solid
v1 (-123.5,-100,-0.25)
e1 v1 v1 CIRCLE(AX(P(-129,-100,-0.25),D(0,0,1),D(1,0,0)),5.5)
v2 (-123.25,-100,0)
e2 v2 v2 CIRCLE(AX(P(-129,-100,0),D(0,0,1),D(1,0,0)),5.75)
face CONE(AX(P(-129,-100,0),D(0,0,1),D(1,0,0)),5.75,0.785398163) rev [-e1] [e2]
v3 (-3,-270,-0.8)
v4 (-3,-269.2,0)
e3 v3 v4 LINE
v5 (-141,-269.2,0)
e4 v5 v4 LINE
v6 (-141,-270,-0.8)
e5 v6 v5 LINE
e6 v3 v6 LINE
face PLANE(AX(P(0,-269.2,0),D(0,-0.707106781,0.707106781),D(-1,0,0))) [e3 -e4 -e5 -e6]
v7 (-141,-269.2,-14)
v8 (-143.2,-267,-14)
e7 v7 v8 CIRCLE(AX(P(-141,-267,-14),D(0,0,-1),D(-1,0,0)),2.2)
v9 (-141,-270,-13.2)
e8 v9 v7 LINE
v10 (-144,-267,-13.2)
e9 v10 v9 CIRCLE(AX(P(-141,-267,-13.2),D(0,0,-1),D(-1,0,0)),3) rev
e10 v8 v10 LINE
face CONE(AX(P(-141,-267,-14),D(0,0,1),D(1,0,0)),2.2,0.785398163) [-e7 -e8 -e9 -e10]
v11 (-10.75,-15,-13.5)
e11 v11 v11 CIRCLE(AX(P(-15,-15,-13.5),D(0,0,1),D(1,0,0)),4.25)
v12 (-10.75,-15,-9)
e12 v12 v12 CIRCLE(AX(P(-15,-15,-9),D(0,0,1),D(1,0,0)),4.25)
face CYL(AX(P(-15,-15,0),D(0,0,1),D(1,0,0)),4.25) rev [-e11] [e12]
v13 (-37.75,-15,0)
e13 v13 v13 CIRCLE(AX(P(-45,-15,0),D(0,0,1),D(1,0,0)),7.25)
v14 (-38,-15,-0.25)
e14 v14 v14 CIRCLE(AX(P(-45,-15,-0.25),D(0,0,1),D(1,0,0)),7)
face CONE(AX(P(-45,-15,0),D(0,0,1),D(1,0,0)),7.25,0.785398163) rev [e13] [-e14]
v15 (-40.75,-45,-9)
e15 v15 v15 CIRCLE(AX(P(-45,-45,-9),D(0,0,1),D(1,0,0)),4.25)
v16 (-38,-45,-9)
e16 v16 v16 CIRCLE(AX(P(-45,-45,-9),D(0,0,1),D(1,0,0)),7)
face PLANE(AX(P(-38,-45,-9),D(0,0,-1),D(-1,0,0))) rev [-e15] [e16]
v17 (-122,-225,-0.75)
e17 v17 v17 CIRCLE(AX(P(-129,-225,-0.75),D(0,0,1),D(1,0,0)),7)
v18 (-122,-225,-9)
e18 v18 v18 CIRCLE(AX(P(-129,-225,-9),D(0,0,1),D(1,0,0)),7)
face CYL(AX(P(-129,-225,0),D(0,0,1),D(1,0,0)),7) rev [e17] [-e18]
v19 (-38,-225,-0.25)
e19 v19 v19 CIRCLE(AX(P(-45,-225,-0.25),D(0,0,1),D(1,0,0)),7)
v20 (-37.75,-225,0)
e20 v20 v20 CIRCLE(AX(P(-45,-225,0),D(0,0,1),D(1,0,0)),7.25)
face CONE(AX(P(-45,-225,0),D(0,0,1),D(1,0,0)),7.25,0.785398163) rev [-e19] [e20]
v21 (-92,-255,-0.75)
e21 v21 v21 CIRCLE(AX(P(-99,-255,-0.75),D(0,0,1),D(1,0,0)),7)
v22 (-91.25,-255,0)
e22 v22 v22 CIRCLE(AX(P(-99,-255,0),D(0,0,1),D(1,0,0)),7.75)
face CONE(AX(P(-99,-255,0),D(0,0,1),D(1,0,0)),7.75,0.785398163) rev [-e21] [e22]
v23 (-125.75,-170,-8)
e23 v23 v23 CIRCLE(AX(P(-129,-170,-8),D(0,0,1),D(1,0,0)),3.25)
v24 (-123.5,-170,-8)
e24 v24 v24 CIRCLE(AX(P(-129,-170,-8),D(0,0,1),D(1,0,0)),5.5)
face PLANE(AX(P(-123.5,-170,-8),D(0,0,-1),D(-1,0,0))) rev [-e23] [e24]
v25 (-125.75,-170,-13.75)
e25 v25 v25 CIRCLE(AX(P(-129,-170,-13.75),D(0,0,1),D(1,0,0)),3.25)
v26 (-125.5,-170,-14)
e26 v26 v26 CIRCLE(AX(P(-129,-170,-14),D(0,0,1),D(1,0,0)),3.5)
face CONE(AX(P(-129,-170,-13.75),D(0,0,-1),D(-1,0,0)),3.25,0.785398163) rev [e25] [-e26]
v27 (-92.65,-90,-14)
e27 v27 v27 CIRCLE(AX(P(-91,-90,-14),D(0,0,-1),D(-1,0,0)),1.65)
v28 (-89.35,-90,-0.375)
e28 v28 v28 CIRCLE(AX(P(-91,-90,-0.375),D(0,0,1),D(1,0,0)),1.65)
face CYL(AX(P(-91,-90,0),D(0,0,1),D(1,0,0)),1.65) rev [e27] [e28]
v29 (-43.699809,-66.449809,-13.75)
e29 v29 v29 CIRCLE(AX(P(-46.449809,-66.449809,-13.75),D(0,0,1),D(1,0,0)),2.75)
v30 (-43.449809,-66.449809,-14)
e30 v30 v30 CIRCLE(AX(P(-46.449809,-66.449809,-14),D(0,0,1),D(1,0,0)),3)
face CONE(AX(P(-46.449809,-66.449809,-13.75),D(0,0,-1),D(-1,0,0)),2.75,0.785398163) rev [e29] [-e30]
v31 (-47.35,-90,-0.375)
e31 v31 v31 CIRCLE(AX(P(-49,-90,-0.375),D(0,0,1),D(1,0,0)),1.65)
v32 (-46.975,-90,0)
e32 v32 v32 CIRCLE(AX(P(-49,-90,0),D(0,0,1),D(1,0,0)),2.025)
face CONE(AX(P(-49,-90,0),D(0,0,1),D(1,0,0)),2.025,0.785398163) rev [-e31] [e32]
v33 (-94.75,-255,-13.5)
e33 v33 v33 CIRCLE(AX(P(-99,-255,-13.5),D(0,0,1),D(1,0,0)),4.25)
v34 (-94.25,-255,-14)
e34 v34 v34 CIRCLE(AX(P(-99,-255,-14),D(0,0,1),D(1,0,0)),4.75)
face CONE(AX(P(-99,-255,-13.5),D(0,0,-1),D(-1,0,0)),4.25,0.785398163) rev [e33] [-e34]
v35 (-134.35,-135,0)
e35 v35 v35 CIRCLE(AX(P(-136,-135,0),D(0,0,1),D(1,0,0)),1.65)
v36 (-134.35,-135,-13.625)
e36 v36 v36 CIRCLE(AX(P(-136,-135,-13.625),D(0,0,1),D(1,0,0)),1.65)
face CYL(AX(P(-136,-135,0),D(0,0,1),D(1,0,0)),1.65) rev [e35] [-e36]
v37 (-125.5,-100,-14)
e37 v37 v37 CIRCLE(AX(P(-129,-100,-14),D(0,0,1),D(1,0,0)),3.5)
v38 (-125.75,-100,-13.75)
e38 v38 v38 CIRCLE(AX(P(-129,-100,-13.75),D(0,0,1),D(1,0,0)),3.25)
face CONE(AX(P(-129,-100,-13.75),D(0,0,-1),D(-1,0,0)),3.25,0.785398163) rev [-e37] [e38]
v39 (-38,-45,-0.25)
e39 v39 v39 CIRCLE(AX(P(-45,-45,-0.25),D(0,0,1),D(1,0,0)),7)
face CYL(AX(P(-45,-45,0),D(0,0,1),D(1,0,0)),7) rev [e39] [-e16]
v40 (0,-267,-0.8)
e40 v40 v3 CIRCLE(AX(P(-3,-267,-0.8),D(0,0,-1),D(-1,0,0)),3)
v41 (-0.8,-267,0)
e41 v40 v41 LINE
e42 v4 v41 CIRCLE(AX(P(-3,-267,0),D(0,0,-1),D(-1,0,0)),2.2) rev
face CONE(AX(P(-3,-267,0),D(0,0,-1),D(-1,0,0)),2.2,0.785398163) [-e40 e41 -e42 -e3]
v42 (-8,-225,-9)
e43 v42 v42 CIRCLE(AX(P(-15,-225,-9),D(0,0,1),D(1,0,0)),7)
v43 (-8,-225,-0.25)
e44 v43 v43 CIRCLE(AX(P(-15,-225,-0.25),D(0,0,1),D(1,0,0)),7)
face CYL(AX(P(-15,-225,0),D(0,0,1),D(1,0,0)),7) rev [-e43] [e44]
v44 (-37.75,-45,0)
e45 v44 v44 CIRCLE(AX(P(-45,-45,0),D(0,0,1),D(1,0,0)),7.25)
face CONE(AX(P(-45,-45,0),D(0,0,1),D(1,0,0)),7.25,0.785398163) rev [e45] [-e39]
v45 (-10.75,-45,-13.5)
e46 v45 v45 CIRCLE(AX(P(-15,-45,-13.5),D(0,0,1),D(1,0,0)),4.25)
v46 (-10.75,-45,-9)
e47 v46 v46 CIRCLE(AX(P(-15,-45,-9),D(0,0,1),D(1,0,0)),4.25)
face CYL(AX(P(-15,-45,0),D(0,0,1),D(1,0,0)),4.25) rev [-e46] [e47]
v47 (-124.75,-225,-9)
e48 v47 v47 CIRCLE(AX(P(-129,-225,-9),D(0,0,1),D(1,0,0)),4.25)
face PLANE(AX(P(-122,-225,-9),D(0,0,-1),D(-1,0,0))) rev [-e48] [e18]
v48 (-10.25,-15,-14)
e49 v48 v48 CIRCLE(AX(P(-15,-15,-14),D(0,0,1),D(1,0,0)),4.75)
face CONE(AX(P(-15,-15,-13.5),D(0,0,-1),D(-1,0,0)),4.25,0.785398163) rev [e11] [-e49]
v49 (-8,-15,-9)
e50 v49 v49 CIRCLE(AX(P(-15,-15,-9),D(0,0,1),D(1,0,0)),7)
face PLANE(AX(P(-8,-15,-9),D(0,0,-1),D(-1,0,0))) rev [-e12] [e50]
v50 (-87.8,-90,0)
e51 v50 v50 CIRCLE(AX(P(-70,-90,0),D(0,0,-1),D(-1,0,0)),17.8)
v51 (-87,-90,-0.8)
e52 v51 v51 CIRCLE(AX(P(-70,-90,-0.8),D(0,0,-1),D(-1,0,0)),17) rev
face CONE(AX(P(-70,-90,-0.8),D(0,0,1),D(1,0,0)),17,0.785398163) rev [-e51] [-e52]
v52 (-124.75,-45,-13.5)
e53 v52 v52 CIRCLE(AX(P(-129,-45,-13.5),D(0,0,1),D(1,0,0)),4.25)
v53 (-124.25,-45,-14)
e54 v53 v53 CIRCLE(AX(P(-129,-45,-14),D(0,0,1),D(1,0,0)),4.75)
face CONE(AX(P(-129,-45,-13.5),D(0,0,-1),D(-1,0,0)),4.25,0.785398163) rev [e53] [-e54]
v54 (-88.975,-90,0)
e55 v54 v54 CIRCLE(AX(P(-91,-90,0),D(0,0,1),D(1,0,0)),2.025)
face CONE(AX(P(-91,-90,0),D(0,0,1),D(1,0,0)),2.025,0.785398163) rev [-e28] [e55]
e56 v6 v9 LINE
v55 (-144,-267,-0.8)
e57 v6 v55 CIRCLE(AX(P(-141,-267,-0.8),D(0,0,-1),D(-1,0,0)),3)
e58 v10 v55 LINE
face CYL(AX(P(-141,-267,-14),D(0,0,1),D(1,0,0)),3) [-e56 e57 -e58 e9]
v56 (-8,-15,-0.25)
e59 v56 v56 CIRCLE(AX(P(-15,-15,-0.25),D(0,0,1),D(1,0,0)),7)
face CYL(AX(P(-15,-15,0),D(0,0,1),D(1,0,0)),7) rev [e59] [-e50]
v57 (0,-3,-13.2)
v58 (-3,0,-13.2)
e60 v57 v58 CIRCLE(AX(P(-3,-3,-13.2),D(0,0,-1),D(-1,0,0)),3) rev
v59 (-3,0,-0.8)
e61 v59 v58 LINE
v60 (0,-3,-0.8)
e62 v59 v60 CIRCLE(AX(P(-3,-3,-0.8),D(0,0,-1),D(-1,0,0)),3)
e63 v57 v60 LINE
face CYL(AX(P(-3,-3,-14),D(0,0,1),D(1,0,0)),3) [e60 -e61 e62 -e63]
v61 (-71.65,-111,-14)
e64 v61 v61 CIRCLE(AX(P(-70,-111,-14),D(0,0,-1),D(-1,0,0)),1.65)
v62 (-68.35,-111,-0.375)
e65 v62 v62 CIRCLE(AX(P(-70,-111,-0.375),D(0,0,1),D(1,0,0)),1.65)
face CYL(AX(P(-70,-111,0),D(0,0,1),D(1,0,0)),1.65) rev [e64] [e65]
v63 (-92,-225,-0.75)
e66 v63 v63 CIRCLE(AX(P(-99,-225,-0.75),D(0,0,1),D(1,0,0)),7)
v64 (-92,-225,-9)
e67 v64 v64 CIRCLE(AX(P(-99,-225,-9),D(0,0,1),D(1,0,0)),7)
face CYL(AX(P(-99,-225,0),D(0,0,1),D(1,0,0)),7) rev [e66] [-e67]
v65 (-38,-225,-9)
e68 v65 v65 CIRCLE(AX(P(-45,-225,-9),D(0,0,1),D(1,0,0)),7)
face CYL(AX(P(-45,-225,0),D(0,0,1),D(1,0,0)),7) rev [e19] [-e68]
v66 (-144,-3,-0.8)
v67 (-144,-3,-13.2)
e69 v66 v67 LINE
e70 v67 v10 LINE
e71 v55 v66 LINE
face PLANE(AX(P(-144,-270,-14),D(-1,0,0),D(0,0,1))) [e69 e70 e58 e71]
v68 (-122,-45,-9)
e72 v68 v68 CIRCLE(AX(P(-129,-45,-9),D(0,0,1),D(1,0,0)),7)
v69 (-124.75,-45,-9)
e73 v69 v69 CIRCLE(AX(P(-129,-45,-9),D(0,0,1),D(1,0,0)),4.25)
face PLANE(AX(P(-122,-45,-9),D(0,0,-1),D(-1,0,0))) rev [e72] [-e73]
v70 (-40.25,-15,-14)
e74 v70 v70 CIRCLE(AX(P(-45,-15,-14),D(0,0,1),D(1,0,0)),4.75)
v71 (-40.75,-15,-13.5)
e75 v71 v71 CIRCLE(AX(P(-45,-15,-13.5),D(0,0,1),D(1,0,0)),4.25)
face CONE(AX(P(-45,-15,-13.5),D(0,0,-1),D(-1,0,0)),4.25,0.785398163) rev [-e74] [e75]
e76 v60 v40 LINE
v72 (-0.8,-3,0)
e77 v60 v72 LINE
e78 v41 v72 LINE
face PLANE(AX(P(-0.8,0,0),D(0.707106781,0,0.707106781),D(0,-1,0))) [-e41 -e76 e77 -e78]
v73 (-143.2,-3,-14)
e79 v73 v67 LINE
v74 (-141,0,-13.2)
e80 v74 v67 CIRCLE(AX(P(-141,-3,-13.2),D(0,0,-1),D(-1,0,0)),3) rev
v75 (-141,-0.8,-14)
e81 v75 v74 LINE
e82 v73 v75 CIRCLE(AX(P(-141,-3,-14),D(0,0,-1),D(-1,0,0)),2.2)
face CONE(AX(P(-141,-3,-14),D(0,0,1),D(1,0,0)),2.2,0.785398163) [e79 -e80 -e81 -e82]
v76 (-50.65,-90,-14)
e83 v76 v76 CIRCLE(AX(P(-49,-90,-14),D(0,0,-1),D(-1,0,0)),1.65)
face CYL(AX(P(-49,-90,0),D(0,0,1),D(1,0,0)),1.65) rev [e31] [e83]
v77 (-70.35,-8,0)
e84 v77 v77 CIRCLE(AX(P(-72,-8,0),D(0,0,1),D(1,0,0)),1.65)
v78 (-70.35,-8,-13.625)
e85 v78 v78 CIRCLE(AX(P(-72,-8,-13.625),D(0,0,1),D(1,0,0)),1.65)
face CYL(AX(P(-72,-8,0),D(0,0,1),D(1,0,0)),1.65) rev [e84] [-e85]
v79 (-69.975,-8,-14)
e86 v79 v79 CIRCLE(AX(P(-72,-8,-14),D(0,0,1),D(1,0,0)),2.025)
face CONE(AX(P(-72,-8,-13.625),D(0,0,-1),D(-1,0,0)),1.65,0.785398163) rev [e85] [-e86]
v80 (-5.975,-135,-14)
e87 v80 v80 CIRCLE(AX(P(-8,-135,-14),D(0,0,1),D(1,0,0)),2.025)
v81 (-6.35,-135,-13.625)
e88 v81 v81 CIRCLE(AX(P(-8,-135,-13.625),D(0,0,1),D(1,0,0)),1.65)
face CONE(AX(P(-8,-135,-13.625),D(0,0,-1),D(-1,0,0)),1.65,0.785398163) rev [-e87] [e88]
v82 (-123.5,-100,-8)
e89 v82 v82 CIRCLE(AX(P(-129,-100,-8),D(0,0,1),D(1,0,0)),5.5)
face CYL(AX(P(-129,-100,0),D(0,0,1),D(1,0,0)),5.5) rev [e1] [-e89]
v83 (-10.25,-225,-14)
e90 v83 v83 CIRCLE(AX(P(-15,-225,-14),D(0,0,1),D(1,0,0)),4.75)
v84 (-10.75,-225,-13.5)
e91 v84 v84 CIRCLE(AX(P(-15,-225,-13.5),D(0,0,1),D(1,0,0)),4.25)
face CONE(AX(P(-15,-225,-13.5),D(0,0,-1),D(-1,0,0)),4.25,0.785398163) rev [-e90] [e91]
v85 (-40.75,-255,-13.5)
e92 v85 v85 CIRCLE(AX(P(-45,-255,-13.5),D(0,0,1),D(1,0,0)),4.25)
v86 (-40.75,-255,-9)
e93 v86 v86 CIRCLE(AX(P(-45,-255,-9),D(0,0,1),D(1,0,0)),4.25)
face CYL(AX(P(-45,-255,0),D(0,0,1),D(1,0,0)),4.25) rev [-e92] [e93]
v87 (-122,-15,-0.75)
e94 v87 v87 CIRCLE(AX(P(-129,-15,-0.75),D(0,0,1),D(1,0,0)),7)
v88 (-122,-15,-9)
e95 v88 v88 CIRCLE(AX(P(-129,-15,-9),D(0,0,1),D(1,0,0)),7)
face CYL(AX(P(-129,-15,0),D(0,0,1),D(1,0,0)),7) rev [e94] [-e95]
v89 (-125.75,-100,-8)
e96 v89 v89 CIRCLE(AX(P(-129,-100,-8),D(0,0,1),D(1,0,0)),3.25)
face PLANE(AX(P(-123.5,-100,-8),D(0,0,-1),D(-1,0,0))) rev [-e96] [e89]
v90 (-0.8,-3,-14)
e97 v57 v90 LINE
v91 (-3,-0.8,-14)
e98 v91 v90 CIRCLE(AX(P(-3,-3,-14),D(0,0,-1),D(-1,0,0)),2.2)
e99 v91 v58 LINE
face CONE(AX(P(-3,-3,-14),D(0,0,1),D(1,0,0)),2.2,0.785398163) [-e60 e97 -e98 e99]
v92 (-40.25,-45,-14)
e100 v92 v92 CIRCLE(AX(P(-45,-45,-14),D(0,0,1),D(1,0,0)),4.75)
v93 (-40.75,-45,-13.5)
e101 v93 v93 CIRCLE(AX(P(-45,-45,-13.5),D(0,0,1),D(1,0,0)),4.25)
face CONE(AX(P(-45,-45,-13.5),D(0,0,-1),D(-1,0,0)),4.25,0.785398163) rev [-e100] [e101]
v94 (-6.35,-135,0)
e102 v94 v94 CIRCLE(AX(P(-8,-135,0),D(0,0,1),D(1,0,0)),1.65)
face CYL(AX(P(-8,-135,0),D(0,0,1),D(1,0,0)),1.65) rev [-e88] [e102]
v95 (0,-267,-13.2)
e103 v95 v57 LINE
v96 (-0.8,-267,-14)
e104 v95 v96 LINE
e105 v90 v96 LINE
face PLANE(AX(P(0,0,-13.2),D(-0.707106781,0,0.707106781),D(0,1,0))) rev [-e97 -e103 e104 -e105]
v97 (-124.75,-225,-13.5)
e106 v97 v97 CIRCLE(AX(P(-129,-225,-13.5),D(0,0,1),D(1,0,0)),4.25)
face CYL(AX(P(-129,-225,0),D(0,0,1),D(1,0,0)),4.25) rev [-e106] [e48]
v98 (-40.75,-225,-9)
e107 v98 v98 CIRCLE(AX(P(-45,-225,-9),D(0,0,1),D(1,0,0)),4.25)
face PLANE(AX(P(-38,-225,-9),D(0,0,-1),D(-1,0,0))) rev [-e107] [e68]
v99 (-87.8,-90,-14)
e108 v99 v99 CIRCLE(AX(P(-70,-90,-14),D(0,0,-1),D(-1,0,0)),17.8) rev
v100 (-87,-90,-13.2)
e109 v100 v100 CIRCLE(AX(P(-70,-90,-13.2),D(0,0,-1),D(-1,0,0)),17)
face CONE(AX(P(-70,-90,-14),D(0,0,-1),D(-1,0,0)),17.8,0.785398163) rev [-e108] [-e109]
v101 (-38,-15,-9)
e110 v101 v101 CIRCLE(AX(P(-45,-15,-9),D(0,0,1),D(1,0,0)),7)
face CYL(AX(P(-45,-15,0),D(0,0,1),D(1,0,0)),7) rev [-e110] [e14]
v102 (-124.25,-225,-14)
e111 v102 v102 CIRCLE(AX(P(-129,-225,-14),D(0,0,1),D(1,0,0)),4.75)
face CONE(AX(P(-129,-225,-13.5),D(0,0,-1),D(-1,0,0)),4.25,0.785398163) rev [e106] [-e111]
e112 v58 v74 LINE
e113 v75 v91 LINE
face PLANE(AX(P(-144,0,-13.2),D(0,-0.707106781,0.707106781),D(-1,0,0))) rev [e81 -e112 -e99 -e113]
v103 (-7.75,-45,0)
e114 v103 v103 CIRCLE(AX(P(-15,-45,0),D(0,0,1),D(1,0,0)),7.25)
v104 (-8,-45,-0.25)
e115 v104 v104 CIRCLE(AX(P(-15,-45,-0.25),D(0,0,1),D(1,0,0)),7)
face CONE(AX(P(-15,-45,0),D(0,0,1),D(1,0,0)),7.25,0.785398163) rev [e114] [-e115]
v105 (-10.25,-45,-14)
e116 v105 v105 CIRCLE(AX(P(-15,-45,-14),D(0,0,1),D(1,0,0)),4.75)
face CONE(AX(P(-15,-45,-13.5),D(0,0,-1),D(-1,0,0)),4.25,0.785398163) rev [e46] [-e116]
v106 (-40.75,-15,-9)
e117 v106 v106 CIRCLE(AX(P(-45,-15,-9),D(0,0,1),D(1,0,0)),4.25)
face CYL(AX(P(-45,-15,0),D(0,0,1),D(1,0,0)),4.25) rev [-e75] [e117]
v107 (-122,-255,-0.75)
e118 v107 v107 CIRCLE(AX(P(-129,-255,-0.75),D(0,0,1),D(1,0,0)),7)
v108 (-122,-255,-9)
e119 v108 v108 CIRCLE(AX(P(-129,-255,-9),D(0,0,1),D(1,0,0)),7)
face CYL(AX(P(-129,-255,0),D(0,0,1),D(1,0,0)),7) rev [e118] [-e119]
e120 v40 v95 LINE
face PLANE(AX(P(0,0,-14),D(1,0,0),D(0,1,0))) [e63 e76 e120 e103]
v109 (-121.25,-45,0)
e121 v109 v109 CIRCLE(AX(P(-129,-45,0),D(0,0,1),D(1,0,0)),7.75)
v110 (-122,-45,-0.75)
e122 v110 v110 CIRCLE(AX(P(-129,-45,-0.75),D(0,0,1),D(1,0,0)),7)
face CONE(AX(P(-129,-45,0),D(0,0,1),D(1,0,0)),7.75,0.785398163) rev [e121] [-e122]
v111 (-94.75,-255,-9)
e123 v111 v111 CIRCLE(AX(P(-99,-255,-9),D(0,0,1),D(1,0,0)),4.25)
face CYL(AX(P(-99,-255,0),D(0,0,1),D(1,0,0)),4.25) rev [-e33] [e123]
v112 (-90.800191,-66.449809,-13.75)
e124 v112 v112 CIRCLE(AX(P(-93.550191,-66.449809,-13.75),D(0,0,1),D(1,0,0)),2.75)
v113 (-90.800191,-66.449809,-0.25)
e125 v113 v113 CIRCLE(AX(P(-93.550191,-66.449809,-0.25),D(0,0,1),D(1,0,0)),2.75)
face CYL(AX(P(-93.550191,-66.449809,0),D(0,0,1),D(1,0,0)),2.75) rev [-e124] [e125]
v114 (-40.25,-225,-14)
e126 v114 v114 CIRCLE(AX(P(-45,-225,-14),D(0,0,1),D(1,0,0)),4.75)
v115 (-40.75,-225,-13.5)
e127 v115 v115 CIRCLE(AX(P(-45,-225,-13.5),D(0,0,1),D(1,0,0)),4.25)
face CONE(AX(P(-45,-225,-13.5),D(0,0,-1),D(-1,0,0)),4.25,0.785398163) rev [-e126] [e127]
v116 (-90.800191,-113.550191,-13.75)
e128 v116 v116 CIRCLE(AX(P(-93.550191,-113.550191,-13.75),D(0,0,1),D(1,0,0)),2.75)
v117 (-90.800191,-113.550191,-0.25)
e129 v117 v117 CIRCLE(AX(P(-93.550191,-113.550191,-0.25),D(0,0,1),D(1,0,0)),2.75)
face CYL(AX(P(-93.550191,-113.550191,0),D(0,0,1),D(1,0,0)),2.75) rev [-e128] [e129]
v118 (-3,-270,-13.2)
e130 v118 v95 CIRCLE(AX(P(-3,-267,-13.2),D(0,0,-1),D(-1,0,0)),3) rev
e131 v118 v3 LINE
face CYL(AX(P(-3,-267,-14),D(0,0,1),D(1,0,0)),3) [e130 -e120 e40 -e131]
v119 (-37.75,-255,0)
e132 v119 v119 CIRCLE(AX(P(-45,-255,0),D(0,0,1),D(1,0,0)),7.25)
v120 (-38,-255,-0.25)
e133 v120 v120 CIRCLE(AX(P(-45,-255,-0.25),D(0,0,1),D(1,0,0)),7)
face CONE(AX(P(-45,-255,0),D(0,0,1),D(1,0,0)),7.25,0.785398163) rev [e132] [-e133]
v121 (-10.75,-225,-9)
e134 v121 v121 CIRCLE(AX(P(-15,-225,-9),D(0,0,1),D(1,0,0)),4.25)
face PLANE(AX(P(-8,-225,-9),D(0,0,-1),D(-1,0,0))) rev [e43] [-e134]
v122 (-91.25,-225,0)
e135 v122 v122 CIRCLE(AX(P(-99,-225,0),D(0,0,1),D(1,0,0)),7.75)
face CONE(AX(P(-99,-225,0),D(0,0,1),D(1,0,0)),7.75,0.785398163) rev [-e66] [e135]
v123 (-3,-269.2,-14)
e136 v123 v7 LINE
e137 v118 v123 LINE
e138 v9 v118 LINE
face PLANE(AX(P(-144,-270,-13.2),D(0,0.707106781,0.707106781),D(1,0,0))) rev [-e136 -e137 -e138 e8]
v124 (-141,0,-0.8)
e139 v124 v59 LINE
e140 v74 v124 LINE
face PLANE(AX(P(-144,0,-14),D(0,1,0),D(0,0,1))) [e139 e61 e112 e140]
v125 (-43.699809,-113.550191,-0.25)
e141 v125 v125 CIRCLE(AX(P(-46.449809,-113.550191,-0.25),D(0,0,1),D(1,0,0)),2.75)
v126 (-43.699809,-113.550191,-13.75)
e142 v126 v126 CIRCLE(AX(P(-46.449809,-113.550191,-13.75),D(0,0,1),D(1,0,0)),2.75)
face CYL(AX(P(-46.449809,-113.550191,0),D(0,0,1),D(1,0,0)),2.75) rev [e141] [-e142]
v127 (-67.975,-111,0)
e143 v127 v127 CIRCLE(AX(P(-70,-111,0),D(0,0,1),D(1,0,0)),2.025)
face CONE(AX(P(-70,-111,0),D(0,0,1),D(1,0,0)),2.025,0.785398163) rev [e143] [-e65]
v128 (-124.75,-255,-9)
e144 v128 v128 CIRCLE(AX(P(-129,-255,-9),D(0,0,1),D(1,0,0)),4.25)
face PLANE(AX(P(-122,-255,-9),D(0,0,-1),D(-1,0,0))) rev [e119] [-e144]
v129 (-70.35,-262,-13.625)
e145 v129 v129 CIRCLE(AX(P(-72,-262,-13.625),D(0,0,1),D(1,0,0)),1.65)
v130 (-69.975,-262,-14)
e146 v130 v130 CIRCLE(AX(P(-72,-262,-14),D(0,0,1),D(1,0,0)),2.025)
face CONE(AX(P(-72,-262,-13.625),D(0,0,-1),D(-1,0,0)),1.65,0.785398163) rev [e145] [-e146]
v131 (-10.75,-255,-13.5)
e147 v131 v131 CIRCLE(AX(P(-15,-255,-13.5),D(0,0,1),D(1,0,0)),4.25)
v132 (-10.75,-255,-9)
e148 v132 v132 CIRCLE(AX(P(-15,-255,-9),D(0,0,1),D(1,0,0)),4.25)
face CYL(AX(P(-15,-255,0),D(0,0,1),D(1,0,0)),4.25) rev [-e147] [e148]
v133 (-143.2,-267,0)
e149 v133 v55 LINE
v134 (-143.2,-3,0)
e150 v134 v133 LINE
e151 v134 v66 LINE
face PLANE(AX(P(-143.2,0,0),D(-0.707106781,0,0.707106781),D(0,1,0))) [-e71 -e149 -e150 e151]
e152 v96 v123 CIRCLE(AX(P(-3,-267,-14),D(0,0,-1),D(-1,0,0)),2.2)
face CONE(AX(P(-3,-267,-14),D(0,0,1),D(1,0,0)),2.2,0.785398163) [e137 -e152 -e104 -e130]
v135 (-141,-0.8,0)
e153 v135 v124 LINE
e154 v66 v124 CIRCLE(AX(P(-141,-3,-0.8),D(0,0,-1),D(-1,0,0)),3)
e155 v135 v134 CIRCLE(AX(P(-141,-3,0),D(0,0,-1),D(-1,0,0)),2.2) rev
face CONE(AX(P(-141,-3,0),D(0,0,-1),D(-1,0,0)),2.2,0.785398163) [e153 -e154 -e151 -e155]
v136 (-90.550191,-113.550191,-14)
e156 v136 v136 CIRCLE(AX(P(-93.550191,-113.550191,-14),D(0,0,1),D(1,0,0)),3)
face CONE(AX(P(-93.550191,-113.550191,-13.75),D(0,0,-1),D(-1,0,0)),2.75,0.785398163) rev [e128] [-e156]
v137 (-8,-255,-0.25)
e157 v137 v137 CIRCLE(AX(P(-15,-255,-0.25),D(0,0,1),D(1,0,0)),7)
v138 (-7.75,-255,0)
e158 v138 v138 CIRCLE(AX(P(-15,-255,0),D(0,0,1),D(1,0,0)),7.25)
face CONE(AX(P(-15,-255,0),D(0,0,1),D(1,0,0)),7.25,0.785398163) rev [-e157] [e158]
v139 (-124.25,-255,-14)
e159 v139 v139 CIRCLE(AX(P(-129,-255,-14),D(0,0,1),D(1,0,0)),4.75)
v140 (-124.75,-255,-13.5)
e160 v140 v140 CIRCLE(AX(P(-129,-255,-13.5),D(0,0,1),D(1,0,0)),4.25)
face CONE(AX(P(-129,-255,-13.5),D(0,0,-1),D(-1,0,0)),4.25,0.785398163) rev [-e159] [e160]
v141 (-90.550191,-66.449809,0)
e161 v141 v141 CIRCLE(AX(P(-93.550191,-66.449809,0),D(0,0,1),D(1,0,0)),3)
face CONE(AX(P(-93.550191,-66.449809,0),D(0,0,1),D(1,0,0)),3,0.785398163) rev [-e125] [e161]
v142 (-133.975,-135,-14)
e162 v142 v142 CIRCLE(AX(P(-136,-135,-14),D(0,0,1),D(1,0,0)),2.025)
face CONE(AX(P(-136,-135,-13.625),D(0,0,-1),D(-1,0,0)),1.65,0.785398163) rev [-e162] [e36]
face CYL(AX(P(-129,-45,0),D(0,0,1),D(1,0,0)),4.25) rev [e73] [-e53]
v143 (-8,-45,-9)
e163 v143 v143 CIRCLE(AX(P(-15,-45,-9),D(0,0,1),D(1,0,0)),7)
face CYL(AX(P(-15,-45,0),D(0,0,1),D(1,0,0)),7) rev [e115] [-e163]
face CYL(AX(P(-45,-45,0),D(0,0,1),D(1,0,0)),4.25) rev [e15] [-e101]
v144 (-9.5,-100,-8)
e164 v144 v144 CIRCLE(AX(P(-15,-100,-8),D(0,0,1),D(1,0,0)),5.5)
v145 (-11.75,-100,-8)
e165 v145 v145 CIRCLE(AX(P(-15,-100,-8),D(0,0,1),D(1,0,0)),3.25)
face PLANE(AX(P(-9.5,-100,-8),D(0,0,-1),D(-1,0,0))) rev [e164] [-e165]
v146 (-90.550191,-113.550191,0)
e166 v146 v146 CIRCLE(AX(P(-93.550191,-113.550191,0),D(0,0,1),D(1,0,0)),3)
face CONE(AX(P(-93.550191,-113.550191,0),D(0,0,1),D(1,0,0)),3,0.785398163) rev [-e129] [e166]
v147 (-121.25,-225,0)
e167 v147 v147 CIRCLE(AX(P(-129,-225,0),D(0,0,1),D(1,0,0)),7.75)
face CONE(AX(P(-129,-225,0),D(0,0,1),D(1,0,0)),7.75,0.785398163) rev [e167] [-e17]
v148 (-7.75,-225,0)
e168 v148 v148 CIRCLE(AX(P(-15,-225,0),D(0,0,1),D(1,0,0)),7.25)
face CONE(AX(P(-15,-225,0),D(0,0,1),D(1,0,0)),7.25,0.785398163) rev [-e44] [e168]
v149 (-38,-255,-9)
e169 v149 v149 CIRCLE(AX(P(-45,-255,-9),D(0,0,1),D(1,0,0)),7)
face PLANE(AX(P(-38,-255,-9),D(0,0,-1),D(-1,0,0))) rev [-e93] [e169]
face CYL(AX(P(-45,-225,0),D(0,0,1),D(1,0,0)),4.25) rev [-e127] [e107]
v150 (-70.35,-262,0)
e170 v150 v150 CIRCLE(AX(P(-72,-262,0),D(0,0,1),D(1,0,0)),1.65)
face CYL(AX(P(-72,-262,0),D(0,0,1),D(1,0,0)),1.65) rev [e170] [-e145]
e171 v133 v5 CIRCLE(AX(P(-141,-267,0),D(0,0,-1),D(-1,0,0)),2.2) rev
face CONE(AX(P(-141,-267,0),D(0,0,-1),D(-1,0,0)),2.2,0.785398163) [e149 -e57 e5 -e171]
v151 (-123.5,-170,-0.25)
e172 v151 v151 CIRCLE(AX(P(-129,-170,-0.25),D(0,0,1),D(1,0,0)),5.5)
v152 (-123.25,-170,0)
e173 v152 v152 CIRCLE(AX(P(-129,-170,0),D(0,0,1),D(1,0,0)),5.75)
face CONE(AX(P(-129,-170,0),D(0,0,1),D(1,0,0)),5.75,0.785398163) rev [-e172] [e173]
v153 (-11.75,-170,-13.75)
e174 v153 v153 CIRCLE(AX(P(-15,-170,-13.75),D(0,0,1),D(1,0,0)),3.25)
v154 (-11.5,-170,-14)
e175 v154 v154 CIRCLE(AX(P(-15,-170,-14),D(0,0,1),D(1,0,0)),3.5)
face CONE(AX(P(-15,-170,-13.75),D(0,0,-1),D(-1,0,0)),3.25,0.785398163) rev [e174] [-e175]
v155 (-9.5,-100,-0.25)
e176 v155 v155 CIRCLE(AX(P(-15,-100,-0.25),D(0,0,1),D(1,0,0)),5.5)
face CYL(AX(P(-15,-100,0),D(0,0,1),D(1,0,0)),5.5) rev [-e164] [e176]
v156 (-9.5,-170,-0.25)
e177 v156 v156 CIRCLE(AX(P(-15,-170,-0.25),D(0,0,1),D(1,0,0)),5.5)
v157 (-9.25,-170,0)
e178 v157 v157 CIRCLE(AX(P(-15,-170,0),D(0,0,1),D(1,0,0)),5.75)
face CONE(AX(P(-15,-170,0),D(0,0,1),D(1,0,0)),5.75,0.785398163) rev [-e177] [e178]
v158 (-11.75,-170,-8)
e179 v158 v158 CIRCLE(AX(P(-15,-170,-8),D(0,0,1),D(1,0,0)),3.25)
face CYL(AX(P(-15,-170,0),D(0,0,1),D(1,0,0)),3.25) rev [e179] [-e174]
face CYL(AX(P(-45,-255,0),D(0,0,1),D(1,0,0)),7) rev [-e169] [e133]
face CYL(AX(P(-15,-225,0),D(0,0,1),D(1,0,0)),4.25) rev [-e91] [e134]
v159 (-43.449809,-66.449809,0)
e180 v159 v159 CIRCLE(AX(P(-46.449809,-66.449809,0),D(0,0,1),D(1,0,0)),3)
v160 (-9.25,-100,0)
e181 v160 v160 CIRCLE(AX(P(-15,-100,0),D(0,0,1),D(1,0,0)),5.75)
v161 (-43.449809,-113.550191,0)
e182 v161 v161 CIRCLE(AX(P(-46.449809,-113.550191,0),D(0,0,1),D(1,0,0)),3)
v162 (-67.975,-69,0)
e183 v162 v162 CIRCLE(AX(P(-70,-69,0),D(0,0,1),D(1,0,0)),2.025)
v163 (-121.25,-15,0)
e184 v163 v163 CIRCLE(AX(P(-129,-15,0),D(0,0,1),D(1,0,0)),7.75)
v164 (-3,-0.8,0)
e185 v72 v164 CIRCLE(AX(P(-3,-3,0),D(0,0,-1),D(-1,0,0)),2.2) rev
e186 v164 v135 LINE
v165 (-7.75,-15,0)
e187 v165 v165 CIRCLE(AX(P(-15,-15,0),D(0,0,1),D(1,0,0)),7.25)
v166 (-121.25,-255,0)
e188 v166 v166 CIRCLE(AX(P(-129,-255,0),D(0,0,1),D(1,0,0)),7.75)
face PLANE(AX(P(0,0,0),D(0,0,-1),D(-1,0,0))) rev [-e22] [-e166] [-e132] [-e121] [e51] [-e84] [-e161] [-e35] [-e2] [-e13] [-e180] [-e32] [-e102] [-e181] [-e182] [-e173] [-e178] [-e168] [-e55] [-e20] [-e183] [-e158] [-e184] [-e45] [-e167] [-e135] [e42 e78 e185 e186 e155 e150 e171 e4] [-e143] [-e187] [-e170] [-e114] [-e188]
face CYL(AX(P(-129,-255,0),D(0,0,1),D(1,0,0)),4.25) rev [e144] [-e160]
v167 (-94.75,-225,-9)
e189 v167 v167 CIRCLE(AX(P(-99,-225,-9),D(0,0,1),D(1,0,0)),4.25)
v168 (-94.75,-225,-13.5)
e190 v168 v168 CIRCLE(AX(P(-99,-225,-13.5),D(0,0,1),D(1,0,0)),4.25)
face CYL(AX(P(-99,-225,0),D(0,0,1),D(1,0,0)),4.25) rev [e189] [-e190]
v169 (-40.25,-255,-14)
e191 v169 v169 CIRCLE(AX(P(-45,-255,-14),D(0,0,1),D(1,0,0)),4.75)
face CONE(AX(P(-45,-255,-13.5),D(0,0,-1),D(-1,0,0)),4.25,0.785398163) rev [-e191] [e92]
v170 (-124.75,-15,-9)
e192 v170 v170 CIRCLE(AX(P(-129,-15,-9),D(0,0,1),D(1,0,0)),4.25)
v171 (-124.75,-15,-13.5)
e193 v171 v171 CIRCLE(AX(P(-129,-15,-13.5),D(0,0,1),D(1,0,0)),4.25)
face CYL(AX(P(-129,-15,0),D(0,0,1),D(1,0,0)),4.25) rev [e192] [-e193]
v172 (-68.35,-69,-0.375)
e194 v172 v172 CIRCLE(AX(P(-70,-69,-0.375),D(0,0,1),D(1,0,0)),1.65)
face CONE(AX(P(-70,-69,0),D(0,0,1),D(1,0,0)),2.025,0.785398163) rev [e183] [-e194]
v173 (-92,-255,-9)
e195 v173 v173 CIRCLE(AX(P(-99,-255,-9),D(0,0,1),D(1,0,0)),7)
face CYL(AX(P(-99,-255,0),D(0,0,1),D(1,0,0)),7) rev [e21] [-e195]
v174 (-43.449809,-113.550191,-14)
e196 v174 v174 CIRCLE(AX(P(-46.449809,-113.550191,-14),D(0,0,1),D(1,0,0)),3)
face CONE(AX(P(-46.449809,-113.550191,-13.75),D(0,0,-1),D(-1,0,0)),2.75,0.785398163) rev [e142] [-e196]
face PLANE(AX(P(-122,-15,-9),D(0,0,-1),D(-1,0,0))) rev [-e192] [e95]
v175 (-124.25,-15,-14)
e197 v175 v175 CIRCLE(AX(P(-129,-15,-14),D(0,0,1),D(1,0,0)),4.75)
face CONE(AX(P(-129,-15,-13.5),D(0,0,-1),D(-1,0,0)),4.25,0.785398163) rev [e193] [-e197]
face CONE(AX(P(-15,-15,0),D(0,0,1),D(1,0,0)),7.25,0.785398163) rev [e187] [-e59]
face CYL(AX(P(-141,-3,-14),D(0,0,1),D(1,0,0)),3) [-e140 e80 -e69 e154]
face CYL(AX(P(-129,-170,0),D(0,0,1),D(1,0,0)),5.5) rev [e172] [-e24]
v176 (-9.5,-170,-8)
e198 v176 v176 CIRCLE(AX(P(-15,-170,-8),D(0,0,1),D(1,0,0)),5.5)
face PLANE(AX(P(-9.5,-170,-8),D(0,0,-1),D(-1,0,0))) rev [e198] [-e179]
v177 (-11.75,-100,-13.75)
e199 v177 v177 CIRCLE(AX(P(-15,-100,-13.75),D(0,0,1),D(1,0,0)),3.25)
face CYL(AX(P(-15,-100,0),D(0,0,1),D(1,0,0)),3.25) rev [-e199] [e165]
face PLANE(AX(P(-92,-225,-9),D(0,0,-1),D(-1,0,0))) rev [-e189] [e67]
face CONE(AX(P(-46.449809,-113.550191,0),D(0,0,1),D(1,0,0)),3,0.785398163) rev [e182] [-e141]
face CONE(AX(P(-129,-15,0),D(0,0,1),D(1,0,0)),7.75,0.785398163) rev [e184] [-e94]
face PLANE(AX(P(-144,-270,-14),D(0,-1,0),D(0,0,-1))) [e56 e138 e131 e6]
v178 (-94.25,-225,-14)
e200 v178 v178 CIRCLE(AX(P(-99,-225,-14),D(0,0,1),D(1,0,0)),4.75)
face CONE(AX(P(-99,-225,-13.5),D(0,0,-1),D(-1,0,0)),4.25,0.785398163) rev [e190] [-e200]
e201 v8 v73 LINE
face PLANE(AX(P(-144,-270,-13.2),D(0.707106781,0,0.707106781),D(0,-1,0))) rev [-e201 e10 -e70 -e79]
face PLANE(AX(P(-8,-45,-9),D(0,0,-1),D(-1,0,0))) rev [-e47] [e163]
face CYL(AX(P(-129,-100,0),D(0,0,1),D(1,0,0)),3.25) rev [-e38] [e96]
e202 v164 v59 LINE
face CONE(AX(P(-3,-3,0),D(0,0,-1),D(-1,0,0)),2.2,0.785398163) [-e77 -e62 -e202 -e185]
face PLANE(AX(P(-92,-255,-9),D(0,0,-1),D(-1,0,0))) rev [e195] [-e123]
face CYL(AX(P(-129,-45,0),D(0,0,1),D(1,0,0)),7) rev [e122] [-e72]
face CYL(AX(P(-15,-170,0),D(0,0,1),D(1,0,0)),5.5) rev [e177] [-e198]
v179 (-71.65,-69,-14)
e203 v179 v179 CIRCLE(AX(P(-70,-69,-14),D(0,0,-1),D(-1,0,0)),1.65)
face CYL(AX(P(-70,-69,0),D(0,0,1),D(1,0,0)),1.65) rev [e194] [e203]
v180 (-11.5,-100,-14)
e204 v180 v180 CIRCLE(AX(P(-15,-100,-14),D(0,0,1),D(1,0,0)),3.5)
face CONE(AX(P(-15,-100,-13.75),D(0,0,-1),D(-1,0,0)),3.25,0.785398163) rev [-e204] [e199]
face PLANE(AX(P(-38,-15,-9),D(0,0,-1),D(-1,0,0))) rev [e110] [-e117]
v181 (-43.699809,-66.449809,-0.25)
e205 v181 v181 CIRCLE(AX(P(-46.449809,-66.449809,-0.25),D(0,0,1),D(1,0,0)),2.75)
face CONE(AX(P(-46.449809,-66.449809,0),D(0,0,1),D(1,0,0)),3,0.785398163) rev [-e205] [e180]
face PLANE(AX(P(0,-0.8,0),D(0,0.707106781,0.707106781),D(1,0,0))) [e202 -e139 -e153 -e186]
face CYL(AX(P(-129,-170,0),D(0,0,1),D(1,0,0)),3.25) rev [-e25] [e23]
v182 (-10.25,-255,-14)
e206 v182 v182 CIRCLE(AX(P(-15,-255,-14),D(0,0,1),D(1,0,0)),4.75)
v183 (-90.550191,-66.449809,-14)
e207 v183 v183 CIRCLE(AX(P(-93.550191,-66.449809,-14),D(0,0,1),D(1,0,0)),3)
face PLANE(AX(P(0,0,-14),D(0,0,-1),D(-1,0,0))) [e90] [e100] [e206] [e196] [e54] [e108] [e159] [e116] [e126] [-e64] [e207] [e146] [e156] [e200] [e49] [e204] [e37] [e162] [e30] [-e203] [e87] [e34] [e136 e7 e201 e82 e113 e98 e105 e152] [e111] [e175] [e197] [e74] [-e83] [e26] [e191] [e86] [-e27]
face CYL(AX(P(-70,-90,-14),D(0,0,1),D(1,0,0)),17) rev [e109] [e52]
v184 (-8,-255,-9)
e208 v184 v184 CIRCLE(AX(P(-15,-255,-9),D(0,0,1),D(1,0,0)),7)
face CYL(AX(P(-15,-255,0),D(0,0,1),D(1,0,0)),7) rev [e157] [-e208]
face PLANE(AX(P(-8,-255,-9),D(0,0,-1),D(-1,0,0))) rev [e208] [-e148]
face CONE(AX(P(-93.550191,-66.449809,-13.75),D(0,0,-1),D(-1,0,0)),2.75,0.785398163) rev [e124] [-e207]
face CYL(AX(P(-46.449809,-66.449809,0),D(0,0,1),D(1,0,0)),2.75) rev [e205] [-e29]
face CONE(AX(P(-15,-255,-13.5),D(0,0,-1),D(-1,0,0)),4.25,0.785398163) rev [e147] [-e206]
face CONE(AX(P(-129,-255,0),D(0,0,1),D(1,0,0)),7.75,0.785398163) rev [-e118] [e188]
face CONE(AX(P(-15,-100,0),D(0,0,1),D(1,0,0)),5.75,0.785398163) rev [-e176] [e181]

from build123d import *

# Parameters (mm, degrees)
SKETCH1_W                                     = 144
SKETCH1_H                                     = 270
SKETCH1_R                                     = 17
BASE_FLANGE1_DEPTH                            = 14
CBORE_FOR_M8_HEX_SOCKET_HEAD_CAP_SCR_2_COUNT  = 2
CBORE_FOR_M8_HEX_SOCKET_HEAD_CAP_SCR_2_PITCH  = 30
CBORE_FOR_M8_HEX_SOCKET_HEAD_CAP_SCR_3_COUNT  = 2
CBORE_FOR_M8_HEX_SOCKET_HEAD_CAP_SCR_3_PITCH  = 42.426406871
CBORE_FOR_M8_HEX_SOCKET_HEAD_CAP_SCR_4_COUNT  = 2
CBORE_FOR_M8_HEX_SOCKET_HEAD_CAP_SCR_4_PITCH  = 30
CBORE_FOR_M8_HEX_SOCKET_HEAD_CAP_SCR_5_COUNT  = 2
CBORE_FOR_M8_HEX_SOCKET_HEAD_CAP_SCR_5_PITCH  = 241.867732449
CBORE_FOR_M8_HEX_SOCKET_HEAD_CAP_SCR_6_COUNT  = 2
CBORE_FOR_M8_HEX_SOCKET_HEAD_CAP_SCR_6_PITCH  = 240
CBORE_FOR_M8_HEX_SOCKET_HEAD_CAP_SCR_7_COUNT  = 2
CBORE_FOR_M8_HEX_SOCKET_HEAD_CAP_SCR_7_PITCH  = 212.132034356
CBORE_FOR_M8_HEX_SOCKET_HEAD_CAP_SCR_8_COUNT  = 2
CBORE_FOR_M8_HEX_SOCKET_HEAD_CAP_SCR_8_PITCH  = 210
M4_TAPPED_HOLE1_D                             = 3.3
M4_TAPPED_HOLE1_CSINK_D                       = 4.05
M4_TAPPED_HOLE1_CSINK_ANGLE                   = 90
M5_CLEARANCE_HOLE1_AT_2_COUNT                 = 2
M5_CLEARANCE_HOLE1_AT_2_PITCH                 = 47.100382695
M5_CLEARANCE_HOLE1_AT_3_COUNT                 = 2
M5_CLEARANCE_HOLE1_AT_3_PITCH                 = 66.61
M5_CLEARANCE_HOLE1_AT_4_COUNT                 = 2
M5_CLEARANCE_HOLE1_AT_4_PITCH                 = 47.100382695
CBORE_FOR_M6_HEX_SOCKET_HEAD_CAP_SCR_2_COUNT  = 2
CBORE_FOR_M6_HEX_SOCKET_HEAD_CAP_SCR_2_PITCH  = 114
CRVPATTERN1_COUNT                             = 2
CRVPATTERN1_PITCH                             = 70
M4_TAPPED_HOLE2_AT_2_COUNT                    = 2
M4_TAPPED_HOLE2_AT_2_PITCH                    = 142.214626533
M4_TAPPED_HOLE2_AT_3_COUNT                    = 2
M4_TAPPED_HOLE2_AT_3_PITCH                    = 254
M4_TAPPED_HOLE2_AT_4_COUNT                    = 2
M4_TAPPED_HOLE2_AT_4_PITCH                    = 142.214626533
CBORE_FOR_M8_HEX_SOCKET_HEAD_CAP_SCR_9_COUNT  = 2
CBORE_FOR_M8_HEX_SOCKET_HEAD_CAP_SCR_9_PITCH  = 30
CBORE_FOR_M8_HEX_SOCKET_HEAD_CAP_SCR_10_COUNT = 2
CBORE_FOR_M8_HEX_SOCKET_HEAD_CAP_SCR_10_PITCH = 210
CBORE_FOR_M8_HEX_SOCKET_HEAD_CAP_SCR_11_COUNT = 2
CBORE_FOR_M8_HEX_SOCKET_HEAD_CAP_SCR_11_PITCH = 240
CBORE_FOR_M8_HEX_SOCKET_HEAD_CAP_SCR_12_COUNT = 2
CBORE_FOR_M8_HEX_SOCKET_HEAD_CAP_SCR_12_PITCH = 212.132034356
CBORE_FOR_M8_HEX_SOCKET_HEAD_CAP_SCR_13_COUNT = 2
CBORE_FOR_M8_HEX_SOCKET_HEAD_CAP_SCR_13_PITCH = 241.867732449
FILLET1_R                                     = 3
CHAMFER1_SIZE                                 = 0.8


# Sheet-metal steps are written as plain solids
with BuildPart() as part:
    # Sketch1 → Base-Flange1 (new body)
    with BuildSketch(Plane.XY):
        with Locations((-72, -135)):
            Rectangle(SKETCH1_W, SKETCH1_H)
        with Locations(Location((-70, -90, 0), (0, 0, 180))):
            Circle(SKETCH1_R, mode=Mode.SUBTRACT)
    extrude(amount=-BASE_FLANGE1_DEPTH)

    # Sketch7 → CBORE for M8 Hex Socket Head Cap Screw1 (revolve, cut)
    with BuildSketch(Plane(origin=(-45, -15, 0), x_dir=(0, -1, 0), z_dir=(1, 0, 0))):
        Polygon((0, 0), (0, 14), (4.75, 14), (4.25, 13.5), (4.25, 9), (7, 9), (7, 0.25), (7.25, 0), align=None)
    cbore_for_m8_hex_socket_head_cap_screw1 = revolve(axis=Axis((-45, -15, 6.35), (0, 0, -1)), mode=Mode.SUBTRACT)

    # CBORE for M8 Hex Socket Head Cap Scr 2: CBORE for M8 Hex Socket Head Cap Screw1 ×2
    with Locations(*[(i * CBORE_FOR_M8_HEX_SOCKET_HEAD_CAP_SCR_2_PITCH, 0, 0) for i in range(1, CBORE_FOR_M8_HEX_SOCKET_HEAD_CAP_SCR_2_COUNT)]):
        add(cbore_for_m8_hex_socket_head_cap_screw1, mode=Mode.SUBTRACT)

    # CBORE for M8 Hex Socket Head Cap Scr 3: CBORE for M8 Hex Socket Head Cap Screw1 ×2
    with Locations(*[Vector(0.7071067811865476, -0.7071067811865475, 0) * (i * CBORE_FOR_M8_HEX_SOCKET_HEAD_CAP_SCR_3_PITCH) for i in range(1, CBORE_FOR_M8_HEX_SOCKET_HEAD_CAP_SCR_3_COUNT)]):
        add(cbore_for_m8_hex_socket_head_cap_screw1, mode=Mode.SUBTRACT)

    # CBORE for M8 Hex Socket Head Cap Scr 4: CBORE for M8 Hex Socket Head Cap Screw1 ×2
    with Locations(*[(0, -i * CBORE_FOR_M8_HEX_SOCKET_HEAD_CAP_SCR_4_PITCH, 0) for i in range(1, CBORE_FOR_M8_HEX_SOCKET_HEAD_CAP_SCR_4_COUNT)]):
        add(cbore_for_m8_hex_socket_head_cap_screw1, mode=Mode.SUBTRACT)

    # CBORE for M8 Hex Socket Head Cap Scr 5: CBORE for M8 Hex Socket Head Cap Screw1 ×2
    with Locations(*[Vector(0.12403473458920848, -0.9922778767136676, 0) * (i * CBORE_FOR_M8_HEX_SOCKET_HEAD_CAP_SCR_5_PITCH) for i in range(1, CBORE_FOR_M8_HEX_SOCKET_HEAD_CAP_SCR_5_COUNT)]):
        add(cbore_for_m8_hex_socket_head_cap_screw1, mode=Mode.SUBTRACT)

    # CBORE for M8 Hex Socket Head Cap Scr 6: CBORE for M8 Hex Socket Head Cap Screw1 ×2
    with Locations(*[(0, -i * CBORE_FOR_M8_HEX_SOCKET_HEAD_CAP_SCR_6_PITCH, 0) for i in range(1, CBORE_FOR_M8_HEX_SOCKET_HEAD_CAP_SCR_6_COUNT)]):
        add(cbore_for_m8_hex_socket_head_cap_screw1, mode=Mode.SUBTRACT)

    # CBORE for M8 Hex Socket Head Cap Scr 7: CBORE for M8 Hex Socket Head Cap Screw1 ×2
    with Locations(*[Vector(0.1414213562373096, -0.9899494936611666, 0) * (i * CBORE_FOR_M8_HEX_SOCKET_HEAD_CAP_SCR_7_PITCH) for i in range(1, CBORE_FOR_M8_HEX_SOCKET_HEAD_CAP_SCR_7_COUNT)]):
        add(cbore_for_m8_hex_socket_head_cap_screw1, mode=Mode.SUBTRACT)

    # CBORE for M8 Hex Socket Head Cap Scr 8: CBORE for M8 Hex Socket Head Cap Screw1 ×2
    with Locations(*[(0, -i * CBORE_FOR_M8_HEX_SOCKET_HEAD_CAP_SCR_8_PITCH, 0) for i in range(1, CBORE_FOR_M8_HEX_SOCKET_HEAD_CAP_SCR_8_COUNT)]):
        add(cbore_for_m8_hex_socket_head_cap_screw1, mode=Mode.SUBTRACT)

    # M4 Tapped Hole1 (through all)
    with Locations(Plane.XY):
        with Locations((-91, -90), (-70, -69), (-49, -90), (-70, -111)):
            CounterSinkHole(M4_TAPPED_HOLE1_D / 2, M4_TAPPED_HOLE1_CSINK_D / 2, counter_sink_angle=M4_TAPPED_HOLE1_CSINK_ANGLE)

    # Sketch16 → M5 Clearance Hole1 (revolve, cut)
    with BuildSketch(Plane(origin=(-93.550191347, -113.550191347, 0), x_dir=(0, -1, 0), z_dir=(1, 0, 0))):
        Polygon((0, 0), (0, 14), (3, 14), (2.75, 13.75), (2.75, 0.25), (3, 0), align=None)
    m5_clearance_hole1 = revolve(axis=Axis((-93.550191347, -113.550191347, 6.35), (0, 0, -1)), mode=Mode.SUBTRACT)

    # M5 Clearance Hole1 at 2: M5 Clearance Hole1 ×2
    with Locations(*[(0, i * M5_CLEARANCE_HOLE1_AT_2_PITCH, 0) for i in range(1, M5_CLEARANCE_HOLE1_AT_2_COUNT)]):
        add(m5_clearance_hole1, mode=Mode.SUBTRACT)

    # M5 Clearance Hole1 at 3: M5 Clearance Hole1 ×2
    with Locations(*[Vector(0.707106781186551, 0.707106781186544, 0) * (i * M5_CLEARANCE_HOLE1_AT_3_PITCH) for i in range(1, M5_CLEARANCE_HOLE1_AT_3_COUNT)]):
        add(m5_clearance_hole1, mode=Mode.SUBTRACT)

    # M5 Clearance Hole1 at 4: M5 Clearance Hole1 ×2
    with Locations(*[(i * M5_CLEARANCE_HOLE1_AT_4_PITCH, 0, 0) for i in range(1, M5_CLEARANCE_HOLE1_AT_4_COUNT)]):
        add(m5_clearance_hole1, mode=Mode.SUBTRACT)

    # Sketch20 → CBORE for M6 Hex Socket Head Cap Screw1 (revolve, cut)
    with BuildSketch(Plane(origin=(-129, -100, 0), x_dir=(0, -1, 0), z_dir=(1, 0, 0))):
        Polygon((0, 0), (0, 14), (3.5, 14), (3.25, 13.75), (3.25, 8), (5.5, 8), (5.5, 0.25), (5.75, 0), align=None)
    cbore_for_m6_hex_socket_head_cap_screw1 = revolve(axis=Axis((-129, -100, 6.35), (0, 0, -1)), mode=Mode.SUBTRACT)

    # CBORE for M6 Hex Socket Head Cap Scr 2: CBORE for M6 Hex Socket Head Cap Screw1 ×2
    with Locations(*[(i * CBORE_FOR_M6_HEX_SOCKET_HEAD_CAP_SCR_2_PITCH, 0, 0) for i in range(1, CBORE_FOR_M6_HEX_SOCKET_HEAD_CAP_SCR_2_COUNT)]):
        add(cbore_for_m6_hex_socket_head_cap_screw1, mode=Mode.SUBTRACT)

    # CrvPattern1: CBORE for M6 Hex Socket Head Cap Screw1 ×2
    with Locations(*[(0, -i * CRVPATTERN1_PITCH, 0) for i in range(1, CRVPATTERN1_COUNT)]):
        add(cbore_for_m6_hex_socket_head_cap_screw1, mode=Mode.SUBTRACT)

    # CrvPattern1 copy 1 sketch → CrvPattern1 copy 1 (revolve, cut)
    with BuildSketch(Plane(origin=(-15, -170, 0), x_dir=(0, -1, 0), z_dir=(1, 0, 0))):
        Polygon((0, 0), (0, 14), (3.5, 14), (3.25, 13.75), (3.25, 8), (5.5, 8), (5.5, 0.25), (5.75, 0), align=None)
    revolve(axis=Axis((-15, -170, 6.35), (0, 0, -1)), mode=Mode.SUBTRACT)

    # Sketch26 → M4 Tapped Hole2 (revolve, cut)
    with BuildSketch(Plane(origin=(-72, -8, 0), x_dir=(0, -1, 0), z_dir=(1, 0, 0))):
        Polygon((0, 0), (0, 14), (2.025, 14), (1.65, 13.625), (1.65, 0), align=None)
    m4_tapped_hole2 = revolve(axis=Axis((-72, -8, 6.35), (0, 0, -1)), mode=Mode.SUBTRACT)

    # M4 Tapped Hole2 at 2: M4 Tapped Hole2 ×2
    with Locations(*[Vector(-0.45002403451816303, -0.8930164434969803, 0) * (i * M4_TAPPED_HOLE2_AT_2_PITCH) for i in range(1, M4_TAPPED_HOLE2_AT_2_COUNT)]):
        add(m4_tapped_hole2, mode=Mode.SUBTRACT)

    # M4 Tapped Hole2 at 3: M4 Tapped Hole2 ×2
    with Locations(*[(0, -i * M4_TAPPED_HOLE2_AT_3_PITCH, 0) for i in range(1, M4_TAPPED_HOLE2_AT_3_COUNT)]):
        add(m4_tapped_hole2, mode=Mode.SUBTRACT)

    # M4 Tapped Hole2 at 4: M4 Tapped Hole2 ×2
    with Locations(*[Vector(0.4500240345181632, -0.8930164434969802, 0) * (i * M4_TAPPED_HOLE2_AT_4_PITCH) for i in range(1, M4_TAPPED_HOLE2_AT_4_COUNT)]):
        add(m4_tapped_hole2, mode=Mode.SUBTRACT)

    # Sketch28 → CBORE for M8 Hex Socket Head Cap Screw2 (revolve, cut)
    with BuildSketch(Plane(origin=(-129, -15, 0), x_dir=(0, -1, 0), z_dir=(1, 0, 0))):
        Polygon((0, 0), (0, 14), (4.75, 14), (4.25, 13.5), (4.25, 9), (7, 9), (7, 0.75), (7.75, 0), align=None)
    cbore_for_m8_hex_socket_head_cap_screw2 = revolve(axis=Axis((-129, -15, 6.35), (0, 0, -1)), mode=Mode.SUBTRACT)

    # CBORE for M8 Hex Socket Head Cap Scr 9: CBORE for M8 Hex Socket Head Cap Screw2 ×2
    with Locations(*[(0, -i * CBORE_FOR_M8_HEX_SOCKET_HEAD_CAP_SCR_9_PITCH, 0) for i in range(1, CBORE_FOR_M8_HEX_SOCKET_HEAD_CAP_SCR_9_COUNT)]):
        add(cbore_for_m8_hex_socket_head_cap_screw2, mode=Mode.SUBTRACT)

    # CBORE for M8 Hex Socket Head Cap Scr 10: CBORE for M8 Hex Socket Head Cap Screw2 ×2
    with Locations(*[(0, -i * CBORE_FOR_M8_HEX_SOCKET_HEAD_CAP_SCR_10_PITCH, 0) for i in range(1, CBORE_FOR_M8_HEX_SOCKET_HEAD_CAP_SCR_10_COUNT)]):
        add(cbore_for_m8_hex_socket_head_cap_screw2, mode=Mode.SUBTRACT)

    # CBORE for M8 Hex Socket Head Cap Scr 11: CBORE for M8 Hex Socket Head Cap Screw2 ×2
    with Locations(*[(0, -i * CBORE_FOR_M8_HEX_SOCKET_HEAD_CAP_SCR_11_PITCH, 0) for i in range(1, CBORE_FOR_M8_HEX_SOCKET_HEAD_CAP_SCR_11_COUNT)]):
        add(cbore_for_m8_hex_socket_head_cap_screw2, mode=Mode.SUBTRACT)

    # CBORE for M8 Hex Socket Head Cap Scr 12: CBORE for M8 Hex Socket Head Cap Screw2 ×2
    with Locations(*[Vector(0.14142135623730956, -0.9899494936611666, 0) * (i * CBORE_FOR_M8_HEX_SOCKET_HEAD_CAP_SCR_12_PITCH) for i in range(1, CBORE_FOR_M8_HEX_SOCKET_HEAD_CAP_SCR_12_COUNT)]):
        add(cbore_for_m8_hex_socket_head_cap_screw2, mode=Mode.SUBTRACT)

    # CBORE for M8 Hex Socket Head Cap Scr 13: CBORE for M8 Hex Socket Head Cap Screw2 ×2
    with Locations(*[Vector(0.12403473458920847, -0.9922778767136677, 0) * (i * CBORE_FOR_M8_HEX_SOCKET_HEAD_CAP_SCR_13_PITCH) for i in range(1, CBORE_FOR_M8_HEX_SOCKET_HEAD_CAP_SCR_13_COUNT)]):
        add(cbore_for_m8_hex_socket_head_cap_screw2, mode=Mode.SUBTRACT)

    # Fillet1
    fillet1_edges = [part.edges().sort_by_distance(p)[0] for p in [
        (0, 0, -7),
        (0, -270, -7),
        (-144, -270, -7),
        (-144, 0, -7),
    ]]
    fillet(fillet1_edges, radius=FILLET1_R)

    # Chamfer1
    chamfer1_edges = [part.edges().sort_by_distance(p)[0] for p in [
        (-53, -90, -14),
        (-53, -90, 0),
        (-72, -270, 0),
        (-72, -270, -14),
        (-72, 0, 0),
        (-144, -135, 0),
        (0, -135, 0),
        (-143.121320344, -0.878679656, 0),
        (-143.121320344, -269.121320344, 0),
        (-0.878679656, -0.878679656, 0),
        (-0.878679656, -269.121320344, 0),
        (0, -135, -14),
        (-72, 0, -14),
        (-144, -135, -14),
        (-143.121320344, -0.878679656, -14),
        (-143.121320344, -269.121320344, -14),
        (-0.878679656, -0.878679656, -14),
        (-0.878679656, -269.121320344, -14),
    ]]
    chamfer(chamfer1_edges, length=CHAMFER1_SIZE)


solid = part.part
